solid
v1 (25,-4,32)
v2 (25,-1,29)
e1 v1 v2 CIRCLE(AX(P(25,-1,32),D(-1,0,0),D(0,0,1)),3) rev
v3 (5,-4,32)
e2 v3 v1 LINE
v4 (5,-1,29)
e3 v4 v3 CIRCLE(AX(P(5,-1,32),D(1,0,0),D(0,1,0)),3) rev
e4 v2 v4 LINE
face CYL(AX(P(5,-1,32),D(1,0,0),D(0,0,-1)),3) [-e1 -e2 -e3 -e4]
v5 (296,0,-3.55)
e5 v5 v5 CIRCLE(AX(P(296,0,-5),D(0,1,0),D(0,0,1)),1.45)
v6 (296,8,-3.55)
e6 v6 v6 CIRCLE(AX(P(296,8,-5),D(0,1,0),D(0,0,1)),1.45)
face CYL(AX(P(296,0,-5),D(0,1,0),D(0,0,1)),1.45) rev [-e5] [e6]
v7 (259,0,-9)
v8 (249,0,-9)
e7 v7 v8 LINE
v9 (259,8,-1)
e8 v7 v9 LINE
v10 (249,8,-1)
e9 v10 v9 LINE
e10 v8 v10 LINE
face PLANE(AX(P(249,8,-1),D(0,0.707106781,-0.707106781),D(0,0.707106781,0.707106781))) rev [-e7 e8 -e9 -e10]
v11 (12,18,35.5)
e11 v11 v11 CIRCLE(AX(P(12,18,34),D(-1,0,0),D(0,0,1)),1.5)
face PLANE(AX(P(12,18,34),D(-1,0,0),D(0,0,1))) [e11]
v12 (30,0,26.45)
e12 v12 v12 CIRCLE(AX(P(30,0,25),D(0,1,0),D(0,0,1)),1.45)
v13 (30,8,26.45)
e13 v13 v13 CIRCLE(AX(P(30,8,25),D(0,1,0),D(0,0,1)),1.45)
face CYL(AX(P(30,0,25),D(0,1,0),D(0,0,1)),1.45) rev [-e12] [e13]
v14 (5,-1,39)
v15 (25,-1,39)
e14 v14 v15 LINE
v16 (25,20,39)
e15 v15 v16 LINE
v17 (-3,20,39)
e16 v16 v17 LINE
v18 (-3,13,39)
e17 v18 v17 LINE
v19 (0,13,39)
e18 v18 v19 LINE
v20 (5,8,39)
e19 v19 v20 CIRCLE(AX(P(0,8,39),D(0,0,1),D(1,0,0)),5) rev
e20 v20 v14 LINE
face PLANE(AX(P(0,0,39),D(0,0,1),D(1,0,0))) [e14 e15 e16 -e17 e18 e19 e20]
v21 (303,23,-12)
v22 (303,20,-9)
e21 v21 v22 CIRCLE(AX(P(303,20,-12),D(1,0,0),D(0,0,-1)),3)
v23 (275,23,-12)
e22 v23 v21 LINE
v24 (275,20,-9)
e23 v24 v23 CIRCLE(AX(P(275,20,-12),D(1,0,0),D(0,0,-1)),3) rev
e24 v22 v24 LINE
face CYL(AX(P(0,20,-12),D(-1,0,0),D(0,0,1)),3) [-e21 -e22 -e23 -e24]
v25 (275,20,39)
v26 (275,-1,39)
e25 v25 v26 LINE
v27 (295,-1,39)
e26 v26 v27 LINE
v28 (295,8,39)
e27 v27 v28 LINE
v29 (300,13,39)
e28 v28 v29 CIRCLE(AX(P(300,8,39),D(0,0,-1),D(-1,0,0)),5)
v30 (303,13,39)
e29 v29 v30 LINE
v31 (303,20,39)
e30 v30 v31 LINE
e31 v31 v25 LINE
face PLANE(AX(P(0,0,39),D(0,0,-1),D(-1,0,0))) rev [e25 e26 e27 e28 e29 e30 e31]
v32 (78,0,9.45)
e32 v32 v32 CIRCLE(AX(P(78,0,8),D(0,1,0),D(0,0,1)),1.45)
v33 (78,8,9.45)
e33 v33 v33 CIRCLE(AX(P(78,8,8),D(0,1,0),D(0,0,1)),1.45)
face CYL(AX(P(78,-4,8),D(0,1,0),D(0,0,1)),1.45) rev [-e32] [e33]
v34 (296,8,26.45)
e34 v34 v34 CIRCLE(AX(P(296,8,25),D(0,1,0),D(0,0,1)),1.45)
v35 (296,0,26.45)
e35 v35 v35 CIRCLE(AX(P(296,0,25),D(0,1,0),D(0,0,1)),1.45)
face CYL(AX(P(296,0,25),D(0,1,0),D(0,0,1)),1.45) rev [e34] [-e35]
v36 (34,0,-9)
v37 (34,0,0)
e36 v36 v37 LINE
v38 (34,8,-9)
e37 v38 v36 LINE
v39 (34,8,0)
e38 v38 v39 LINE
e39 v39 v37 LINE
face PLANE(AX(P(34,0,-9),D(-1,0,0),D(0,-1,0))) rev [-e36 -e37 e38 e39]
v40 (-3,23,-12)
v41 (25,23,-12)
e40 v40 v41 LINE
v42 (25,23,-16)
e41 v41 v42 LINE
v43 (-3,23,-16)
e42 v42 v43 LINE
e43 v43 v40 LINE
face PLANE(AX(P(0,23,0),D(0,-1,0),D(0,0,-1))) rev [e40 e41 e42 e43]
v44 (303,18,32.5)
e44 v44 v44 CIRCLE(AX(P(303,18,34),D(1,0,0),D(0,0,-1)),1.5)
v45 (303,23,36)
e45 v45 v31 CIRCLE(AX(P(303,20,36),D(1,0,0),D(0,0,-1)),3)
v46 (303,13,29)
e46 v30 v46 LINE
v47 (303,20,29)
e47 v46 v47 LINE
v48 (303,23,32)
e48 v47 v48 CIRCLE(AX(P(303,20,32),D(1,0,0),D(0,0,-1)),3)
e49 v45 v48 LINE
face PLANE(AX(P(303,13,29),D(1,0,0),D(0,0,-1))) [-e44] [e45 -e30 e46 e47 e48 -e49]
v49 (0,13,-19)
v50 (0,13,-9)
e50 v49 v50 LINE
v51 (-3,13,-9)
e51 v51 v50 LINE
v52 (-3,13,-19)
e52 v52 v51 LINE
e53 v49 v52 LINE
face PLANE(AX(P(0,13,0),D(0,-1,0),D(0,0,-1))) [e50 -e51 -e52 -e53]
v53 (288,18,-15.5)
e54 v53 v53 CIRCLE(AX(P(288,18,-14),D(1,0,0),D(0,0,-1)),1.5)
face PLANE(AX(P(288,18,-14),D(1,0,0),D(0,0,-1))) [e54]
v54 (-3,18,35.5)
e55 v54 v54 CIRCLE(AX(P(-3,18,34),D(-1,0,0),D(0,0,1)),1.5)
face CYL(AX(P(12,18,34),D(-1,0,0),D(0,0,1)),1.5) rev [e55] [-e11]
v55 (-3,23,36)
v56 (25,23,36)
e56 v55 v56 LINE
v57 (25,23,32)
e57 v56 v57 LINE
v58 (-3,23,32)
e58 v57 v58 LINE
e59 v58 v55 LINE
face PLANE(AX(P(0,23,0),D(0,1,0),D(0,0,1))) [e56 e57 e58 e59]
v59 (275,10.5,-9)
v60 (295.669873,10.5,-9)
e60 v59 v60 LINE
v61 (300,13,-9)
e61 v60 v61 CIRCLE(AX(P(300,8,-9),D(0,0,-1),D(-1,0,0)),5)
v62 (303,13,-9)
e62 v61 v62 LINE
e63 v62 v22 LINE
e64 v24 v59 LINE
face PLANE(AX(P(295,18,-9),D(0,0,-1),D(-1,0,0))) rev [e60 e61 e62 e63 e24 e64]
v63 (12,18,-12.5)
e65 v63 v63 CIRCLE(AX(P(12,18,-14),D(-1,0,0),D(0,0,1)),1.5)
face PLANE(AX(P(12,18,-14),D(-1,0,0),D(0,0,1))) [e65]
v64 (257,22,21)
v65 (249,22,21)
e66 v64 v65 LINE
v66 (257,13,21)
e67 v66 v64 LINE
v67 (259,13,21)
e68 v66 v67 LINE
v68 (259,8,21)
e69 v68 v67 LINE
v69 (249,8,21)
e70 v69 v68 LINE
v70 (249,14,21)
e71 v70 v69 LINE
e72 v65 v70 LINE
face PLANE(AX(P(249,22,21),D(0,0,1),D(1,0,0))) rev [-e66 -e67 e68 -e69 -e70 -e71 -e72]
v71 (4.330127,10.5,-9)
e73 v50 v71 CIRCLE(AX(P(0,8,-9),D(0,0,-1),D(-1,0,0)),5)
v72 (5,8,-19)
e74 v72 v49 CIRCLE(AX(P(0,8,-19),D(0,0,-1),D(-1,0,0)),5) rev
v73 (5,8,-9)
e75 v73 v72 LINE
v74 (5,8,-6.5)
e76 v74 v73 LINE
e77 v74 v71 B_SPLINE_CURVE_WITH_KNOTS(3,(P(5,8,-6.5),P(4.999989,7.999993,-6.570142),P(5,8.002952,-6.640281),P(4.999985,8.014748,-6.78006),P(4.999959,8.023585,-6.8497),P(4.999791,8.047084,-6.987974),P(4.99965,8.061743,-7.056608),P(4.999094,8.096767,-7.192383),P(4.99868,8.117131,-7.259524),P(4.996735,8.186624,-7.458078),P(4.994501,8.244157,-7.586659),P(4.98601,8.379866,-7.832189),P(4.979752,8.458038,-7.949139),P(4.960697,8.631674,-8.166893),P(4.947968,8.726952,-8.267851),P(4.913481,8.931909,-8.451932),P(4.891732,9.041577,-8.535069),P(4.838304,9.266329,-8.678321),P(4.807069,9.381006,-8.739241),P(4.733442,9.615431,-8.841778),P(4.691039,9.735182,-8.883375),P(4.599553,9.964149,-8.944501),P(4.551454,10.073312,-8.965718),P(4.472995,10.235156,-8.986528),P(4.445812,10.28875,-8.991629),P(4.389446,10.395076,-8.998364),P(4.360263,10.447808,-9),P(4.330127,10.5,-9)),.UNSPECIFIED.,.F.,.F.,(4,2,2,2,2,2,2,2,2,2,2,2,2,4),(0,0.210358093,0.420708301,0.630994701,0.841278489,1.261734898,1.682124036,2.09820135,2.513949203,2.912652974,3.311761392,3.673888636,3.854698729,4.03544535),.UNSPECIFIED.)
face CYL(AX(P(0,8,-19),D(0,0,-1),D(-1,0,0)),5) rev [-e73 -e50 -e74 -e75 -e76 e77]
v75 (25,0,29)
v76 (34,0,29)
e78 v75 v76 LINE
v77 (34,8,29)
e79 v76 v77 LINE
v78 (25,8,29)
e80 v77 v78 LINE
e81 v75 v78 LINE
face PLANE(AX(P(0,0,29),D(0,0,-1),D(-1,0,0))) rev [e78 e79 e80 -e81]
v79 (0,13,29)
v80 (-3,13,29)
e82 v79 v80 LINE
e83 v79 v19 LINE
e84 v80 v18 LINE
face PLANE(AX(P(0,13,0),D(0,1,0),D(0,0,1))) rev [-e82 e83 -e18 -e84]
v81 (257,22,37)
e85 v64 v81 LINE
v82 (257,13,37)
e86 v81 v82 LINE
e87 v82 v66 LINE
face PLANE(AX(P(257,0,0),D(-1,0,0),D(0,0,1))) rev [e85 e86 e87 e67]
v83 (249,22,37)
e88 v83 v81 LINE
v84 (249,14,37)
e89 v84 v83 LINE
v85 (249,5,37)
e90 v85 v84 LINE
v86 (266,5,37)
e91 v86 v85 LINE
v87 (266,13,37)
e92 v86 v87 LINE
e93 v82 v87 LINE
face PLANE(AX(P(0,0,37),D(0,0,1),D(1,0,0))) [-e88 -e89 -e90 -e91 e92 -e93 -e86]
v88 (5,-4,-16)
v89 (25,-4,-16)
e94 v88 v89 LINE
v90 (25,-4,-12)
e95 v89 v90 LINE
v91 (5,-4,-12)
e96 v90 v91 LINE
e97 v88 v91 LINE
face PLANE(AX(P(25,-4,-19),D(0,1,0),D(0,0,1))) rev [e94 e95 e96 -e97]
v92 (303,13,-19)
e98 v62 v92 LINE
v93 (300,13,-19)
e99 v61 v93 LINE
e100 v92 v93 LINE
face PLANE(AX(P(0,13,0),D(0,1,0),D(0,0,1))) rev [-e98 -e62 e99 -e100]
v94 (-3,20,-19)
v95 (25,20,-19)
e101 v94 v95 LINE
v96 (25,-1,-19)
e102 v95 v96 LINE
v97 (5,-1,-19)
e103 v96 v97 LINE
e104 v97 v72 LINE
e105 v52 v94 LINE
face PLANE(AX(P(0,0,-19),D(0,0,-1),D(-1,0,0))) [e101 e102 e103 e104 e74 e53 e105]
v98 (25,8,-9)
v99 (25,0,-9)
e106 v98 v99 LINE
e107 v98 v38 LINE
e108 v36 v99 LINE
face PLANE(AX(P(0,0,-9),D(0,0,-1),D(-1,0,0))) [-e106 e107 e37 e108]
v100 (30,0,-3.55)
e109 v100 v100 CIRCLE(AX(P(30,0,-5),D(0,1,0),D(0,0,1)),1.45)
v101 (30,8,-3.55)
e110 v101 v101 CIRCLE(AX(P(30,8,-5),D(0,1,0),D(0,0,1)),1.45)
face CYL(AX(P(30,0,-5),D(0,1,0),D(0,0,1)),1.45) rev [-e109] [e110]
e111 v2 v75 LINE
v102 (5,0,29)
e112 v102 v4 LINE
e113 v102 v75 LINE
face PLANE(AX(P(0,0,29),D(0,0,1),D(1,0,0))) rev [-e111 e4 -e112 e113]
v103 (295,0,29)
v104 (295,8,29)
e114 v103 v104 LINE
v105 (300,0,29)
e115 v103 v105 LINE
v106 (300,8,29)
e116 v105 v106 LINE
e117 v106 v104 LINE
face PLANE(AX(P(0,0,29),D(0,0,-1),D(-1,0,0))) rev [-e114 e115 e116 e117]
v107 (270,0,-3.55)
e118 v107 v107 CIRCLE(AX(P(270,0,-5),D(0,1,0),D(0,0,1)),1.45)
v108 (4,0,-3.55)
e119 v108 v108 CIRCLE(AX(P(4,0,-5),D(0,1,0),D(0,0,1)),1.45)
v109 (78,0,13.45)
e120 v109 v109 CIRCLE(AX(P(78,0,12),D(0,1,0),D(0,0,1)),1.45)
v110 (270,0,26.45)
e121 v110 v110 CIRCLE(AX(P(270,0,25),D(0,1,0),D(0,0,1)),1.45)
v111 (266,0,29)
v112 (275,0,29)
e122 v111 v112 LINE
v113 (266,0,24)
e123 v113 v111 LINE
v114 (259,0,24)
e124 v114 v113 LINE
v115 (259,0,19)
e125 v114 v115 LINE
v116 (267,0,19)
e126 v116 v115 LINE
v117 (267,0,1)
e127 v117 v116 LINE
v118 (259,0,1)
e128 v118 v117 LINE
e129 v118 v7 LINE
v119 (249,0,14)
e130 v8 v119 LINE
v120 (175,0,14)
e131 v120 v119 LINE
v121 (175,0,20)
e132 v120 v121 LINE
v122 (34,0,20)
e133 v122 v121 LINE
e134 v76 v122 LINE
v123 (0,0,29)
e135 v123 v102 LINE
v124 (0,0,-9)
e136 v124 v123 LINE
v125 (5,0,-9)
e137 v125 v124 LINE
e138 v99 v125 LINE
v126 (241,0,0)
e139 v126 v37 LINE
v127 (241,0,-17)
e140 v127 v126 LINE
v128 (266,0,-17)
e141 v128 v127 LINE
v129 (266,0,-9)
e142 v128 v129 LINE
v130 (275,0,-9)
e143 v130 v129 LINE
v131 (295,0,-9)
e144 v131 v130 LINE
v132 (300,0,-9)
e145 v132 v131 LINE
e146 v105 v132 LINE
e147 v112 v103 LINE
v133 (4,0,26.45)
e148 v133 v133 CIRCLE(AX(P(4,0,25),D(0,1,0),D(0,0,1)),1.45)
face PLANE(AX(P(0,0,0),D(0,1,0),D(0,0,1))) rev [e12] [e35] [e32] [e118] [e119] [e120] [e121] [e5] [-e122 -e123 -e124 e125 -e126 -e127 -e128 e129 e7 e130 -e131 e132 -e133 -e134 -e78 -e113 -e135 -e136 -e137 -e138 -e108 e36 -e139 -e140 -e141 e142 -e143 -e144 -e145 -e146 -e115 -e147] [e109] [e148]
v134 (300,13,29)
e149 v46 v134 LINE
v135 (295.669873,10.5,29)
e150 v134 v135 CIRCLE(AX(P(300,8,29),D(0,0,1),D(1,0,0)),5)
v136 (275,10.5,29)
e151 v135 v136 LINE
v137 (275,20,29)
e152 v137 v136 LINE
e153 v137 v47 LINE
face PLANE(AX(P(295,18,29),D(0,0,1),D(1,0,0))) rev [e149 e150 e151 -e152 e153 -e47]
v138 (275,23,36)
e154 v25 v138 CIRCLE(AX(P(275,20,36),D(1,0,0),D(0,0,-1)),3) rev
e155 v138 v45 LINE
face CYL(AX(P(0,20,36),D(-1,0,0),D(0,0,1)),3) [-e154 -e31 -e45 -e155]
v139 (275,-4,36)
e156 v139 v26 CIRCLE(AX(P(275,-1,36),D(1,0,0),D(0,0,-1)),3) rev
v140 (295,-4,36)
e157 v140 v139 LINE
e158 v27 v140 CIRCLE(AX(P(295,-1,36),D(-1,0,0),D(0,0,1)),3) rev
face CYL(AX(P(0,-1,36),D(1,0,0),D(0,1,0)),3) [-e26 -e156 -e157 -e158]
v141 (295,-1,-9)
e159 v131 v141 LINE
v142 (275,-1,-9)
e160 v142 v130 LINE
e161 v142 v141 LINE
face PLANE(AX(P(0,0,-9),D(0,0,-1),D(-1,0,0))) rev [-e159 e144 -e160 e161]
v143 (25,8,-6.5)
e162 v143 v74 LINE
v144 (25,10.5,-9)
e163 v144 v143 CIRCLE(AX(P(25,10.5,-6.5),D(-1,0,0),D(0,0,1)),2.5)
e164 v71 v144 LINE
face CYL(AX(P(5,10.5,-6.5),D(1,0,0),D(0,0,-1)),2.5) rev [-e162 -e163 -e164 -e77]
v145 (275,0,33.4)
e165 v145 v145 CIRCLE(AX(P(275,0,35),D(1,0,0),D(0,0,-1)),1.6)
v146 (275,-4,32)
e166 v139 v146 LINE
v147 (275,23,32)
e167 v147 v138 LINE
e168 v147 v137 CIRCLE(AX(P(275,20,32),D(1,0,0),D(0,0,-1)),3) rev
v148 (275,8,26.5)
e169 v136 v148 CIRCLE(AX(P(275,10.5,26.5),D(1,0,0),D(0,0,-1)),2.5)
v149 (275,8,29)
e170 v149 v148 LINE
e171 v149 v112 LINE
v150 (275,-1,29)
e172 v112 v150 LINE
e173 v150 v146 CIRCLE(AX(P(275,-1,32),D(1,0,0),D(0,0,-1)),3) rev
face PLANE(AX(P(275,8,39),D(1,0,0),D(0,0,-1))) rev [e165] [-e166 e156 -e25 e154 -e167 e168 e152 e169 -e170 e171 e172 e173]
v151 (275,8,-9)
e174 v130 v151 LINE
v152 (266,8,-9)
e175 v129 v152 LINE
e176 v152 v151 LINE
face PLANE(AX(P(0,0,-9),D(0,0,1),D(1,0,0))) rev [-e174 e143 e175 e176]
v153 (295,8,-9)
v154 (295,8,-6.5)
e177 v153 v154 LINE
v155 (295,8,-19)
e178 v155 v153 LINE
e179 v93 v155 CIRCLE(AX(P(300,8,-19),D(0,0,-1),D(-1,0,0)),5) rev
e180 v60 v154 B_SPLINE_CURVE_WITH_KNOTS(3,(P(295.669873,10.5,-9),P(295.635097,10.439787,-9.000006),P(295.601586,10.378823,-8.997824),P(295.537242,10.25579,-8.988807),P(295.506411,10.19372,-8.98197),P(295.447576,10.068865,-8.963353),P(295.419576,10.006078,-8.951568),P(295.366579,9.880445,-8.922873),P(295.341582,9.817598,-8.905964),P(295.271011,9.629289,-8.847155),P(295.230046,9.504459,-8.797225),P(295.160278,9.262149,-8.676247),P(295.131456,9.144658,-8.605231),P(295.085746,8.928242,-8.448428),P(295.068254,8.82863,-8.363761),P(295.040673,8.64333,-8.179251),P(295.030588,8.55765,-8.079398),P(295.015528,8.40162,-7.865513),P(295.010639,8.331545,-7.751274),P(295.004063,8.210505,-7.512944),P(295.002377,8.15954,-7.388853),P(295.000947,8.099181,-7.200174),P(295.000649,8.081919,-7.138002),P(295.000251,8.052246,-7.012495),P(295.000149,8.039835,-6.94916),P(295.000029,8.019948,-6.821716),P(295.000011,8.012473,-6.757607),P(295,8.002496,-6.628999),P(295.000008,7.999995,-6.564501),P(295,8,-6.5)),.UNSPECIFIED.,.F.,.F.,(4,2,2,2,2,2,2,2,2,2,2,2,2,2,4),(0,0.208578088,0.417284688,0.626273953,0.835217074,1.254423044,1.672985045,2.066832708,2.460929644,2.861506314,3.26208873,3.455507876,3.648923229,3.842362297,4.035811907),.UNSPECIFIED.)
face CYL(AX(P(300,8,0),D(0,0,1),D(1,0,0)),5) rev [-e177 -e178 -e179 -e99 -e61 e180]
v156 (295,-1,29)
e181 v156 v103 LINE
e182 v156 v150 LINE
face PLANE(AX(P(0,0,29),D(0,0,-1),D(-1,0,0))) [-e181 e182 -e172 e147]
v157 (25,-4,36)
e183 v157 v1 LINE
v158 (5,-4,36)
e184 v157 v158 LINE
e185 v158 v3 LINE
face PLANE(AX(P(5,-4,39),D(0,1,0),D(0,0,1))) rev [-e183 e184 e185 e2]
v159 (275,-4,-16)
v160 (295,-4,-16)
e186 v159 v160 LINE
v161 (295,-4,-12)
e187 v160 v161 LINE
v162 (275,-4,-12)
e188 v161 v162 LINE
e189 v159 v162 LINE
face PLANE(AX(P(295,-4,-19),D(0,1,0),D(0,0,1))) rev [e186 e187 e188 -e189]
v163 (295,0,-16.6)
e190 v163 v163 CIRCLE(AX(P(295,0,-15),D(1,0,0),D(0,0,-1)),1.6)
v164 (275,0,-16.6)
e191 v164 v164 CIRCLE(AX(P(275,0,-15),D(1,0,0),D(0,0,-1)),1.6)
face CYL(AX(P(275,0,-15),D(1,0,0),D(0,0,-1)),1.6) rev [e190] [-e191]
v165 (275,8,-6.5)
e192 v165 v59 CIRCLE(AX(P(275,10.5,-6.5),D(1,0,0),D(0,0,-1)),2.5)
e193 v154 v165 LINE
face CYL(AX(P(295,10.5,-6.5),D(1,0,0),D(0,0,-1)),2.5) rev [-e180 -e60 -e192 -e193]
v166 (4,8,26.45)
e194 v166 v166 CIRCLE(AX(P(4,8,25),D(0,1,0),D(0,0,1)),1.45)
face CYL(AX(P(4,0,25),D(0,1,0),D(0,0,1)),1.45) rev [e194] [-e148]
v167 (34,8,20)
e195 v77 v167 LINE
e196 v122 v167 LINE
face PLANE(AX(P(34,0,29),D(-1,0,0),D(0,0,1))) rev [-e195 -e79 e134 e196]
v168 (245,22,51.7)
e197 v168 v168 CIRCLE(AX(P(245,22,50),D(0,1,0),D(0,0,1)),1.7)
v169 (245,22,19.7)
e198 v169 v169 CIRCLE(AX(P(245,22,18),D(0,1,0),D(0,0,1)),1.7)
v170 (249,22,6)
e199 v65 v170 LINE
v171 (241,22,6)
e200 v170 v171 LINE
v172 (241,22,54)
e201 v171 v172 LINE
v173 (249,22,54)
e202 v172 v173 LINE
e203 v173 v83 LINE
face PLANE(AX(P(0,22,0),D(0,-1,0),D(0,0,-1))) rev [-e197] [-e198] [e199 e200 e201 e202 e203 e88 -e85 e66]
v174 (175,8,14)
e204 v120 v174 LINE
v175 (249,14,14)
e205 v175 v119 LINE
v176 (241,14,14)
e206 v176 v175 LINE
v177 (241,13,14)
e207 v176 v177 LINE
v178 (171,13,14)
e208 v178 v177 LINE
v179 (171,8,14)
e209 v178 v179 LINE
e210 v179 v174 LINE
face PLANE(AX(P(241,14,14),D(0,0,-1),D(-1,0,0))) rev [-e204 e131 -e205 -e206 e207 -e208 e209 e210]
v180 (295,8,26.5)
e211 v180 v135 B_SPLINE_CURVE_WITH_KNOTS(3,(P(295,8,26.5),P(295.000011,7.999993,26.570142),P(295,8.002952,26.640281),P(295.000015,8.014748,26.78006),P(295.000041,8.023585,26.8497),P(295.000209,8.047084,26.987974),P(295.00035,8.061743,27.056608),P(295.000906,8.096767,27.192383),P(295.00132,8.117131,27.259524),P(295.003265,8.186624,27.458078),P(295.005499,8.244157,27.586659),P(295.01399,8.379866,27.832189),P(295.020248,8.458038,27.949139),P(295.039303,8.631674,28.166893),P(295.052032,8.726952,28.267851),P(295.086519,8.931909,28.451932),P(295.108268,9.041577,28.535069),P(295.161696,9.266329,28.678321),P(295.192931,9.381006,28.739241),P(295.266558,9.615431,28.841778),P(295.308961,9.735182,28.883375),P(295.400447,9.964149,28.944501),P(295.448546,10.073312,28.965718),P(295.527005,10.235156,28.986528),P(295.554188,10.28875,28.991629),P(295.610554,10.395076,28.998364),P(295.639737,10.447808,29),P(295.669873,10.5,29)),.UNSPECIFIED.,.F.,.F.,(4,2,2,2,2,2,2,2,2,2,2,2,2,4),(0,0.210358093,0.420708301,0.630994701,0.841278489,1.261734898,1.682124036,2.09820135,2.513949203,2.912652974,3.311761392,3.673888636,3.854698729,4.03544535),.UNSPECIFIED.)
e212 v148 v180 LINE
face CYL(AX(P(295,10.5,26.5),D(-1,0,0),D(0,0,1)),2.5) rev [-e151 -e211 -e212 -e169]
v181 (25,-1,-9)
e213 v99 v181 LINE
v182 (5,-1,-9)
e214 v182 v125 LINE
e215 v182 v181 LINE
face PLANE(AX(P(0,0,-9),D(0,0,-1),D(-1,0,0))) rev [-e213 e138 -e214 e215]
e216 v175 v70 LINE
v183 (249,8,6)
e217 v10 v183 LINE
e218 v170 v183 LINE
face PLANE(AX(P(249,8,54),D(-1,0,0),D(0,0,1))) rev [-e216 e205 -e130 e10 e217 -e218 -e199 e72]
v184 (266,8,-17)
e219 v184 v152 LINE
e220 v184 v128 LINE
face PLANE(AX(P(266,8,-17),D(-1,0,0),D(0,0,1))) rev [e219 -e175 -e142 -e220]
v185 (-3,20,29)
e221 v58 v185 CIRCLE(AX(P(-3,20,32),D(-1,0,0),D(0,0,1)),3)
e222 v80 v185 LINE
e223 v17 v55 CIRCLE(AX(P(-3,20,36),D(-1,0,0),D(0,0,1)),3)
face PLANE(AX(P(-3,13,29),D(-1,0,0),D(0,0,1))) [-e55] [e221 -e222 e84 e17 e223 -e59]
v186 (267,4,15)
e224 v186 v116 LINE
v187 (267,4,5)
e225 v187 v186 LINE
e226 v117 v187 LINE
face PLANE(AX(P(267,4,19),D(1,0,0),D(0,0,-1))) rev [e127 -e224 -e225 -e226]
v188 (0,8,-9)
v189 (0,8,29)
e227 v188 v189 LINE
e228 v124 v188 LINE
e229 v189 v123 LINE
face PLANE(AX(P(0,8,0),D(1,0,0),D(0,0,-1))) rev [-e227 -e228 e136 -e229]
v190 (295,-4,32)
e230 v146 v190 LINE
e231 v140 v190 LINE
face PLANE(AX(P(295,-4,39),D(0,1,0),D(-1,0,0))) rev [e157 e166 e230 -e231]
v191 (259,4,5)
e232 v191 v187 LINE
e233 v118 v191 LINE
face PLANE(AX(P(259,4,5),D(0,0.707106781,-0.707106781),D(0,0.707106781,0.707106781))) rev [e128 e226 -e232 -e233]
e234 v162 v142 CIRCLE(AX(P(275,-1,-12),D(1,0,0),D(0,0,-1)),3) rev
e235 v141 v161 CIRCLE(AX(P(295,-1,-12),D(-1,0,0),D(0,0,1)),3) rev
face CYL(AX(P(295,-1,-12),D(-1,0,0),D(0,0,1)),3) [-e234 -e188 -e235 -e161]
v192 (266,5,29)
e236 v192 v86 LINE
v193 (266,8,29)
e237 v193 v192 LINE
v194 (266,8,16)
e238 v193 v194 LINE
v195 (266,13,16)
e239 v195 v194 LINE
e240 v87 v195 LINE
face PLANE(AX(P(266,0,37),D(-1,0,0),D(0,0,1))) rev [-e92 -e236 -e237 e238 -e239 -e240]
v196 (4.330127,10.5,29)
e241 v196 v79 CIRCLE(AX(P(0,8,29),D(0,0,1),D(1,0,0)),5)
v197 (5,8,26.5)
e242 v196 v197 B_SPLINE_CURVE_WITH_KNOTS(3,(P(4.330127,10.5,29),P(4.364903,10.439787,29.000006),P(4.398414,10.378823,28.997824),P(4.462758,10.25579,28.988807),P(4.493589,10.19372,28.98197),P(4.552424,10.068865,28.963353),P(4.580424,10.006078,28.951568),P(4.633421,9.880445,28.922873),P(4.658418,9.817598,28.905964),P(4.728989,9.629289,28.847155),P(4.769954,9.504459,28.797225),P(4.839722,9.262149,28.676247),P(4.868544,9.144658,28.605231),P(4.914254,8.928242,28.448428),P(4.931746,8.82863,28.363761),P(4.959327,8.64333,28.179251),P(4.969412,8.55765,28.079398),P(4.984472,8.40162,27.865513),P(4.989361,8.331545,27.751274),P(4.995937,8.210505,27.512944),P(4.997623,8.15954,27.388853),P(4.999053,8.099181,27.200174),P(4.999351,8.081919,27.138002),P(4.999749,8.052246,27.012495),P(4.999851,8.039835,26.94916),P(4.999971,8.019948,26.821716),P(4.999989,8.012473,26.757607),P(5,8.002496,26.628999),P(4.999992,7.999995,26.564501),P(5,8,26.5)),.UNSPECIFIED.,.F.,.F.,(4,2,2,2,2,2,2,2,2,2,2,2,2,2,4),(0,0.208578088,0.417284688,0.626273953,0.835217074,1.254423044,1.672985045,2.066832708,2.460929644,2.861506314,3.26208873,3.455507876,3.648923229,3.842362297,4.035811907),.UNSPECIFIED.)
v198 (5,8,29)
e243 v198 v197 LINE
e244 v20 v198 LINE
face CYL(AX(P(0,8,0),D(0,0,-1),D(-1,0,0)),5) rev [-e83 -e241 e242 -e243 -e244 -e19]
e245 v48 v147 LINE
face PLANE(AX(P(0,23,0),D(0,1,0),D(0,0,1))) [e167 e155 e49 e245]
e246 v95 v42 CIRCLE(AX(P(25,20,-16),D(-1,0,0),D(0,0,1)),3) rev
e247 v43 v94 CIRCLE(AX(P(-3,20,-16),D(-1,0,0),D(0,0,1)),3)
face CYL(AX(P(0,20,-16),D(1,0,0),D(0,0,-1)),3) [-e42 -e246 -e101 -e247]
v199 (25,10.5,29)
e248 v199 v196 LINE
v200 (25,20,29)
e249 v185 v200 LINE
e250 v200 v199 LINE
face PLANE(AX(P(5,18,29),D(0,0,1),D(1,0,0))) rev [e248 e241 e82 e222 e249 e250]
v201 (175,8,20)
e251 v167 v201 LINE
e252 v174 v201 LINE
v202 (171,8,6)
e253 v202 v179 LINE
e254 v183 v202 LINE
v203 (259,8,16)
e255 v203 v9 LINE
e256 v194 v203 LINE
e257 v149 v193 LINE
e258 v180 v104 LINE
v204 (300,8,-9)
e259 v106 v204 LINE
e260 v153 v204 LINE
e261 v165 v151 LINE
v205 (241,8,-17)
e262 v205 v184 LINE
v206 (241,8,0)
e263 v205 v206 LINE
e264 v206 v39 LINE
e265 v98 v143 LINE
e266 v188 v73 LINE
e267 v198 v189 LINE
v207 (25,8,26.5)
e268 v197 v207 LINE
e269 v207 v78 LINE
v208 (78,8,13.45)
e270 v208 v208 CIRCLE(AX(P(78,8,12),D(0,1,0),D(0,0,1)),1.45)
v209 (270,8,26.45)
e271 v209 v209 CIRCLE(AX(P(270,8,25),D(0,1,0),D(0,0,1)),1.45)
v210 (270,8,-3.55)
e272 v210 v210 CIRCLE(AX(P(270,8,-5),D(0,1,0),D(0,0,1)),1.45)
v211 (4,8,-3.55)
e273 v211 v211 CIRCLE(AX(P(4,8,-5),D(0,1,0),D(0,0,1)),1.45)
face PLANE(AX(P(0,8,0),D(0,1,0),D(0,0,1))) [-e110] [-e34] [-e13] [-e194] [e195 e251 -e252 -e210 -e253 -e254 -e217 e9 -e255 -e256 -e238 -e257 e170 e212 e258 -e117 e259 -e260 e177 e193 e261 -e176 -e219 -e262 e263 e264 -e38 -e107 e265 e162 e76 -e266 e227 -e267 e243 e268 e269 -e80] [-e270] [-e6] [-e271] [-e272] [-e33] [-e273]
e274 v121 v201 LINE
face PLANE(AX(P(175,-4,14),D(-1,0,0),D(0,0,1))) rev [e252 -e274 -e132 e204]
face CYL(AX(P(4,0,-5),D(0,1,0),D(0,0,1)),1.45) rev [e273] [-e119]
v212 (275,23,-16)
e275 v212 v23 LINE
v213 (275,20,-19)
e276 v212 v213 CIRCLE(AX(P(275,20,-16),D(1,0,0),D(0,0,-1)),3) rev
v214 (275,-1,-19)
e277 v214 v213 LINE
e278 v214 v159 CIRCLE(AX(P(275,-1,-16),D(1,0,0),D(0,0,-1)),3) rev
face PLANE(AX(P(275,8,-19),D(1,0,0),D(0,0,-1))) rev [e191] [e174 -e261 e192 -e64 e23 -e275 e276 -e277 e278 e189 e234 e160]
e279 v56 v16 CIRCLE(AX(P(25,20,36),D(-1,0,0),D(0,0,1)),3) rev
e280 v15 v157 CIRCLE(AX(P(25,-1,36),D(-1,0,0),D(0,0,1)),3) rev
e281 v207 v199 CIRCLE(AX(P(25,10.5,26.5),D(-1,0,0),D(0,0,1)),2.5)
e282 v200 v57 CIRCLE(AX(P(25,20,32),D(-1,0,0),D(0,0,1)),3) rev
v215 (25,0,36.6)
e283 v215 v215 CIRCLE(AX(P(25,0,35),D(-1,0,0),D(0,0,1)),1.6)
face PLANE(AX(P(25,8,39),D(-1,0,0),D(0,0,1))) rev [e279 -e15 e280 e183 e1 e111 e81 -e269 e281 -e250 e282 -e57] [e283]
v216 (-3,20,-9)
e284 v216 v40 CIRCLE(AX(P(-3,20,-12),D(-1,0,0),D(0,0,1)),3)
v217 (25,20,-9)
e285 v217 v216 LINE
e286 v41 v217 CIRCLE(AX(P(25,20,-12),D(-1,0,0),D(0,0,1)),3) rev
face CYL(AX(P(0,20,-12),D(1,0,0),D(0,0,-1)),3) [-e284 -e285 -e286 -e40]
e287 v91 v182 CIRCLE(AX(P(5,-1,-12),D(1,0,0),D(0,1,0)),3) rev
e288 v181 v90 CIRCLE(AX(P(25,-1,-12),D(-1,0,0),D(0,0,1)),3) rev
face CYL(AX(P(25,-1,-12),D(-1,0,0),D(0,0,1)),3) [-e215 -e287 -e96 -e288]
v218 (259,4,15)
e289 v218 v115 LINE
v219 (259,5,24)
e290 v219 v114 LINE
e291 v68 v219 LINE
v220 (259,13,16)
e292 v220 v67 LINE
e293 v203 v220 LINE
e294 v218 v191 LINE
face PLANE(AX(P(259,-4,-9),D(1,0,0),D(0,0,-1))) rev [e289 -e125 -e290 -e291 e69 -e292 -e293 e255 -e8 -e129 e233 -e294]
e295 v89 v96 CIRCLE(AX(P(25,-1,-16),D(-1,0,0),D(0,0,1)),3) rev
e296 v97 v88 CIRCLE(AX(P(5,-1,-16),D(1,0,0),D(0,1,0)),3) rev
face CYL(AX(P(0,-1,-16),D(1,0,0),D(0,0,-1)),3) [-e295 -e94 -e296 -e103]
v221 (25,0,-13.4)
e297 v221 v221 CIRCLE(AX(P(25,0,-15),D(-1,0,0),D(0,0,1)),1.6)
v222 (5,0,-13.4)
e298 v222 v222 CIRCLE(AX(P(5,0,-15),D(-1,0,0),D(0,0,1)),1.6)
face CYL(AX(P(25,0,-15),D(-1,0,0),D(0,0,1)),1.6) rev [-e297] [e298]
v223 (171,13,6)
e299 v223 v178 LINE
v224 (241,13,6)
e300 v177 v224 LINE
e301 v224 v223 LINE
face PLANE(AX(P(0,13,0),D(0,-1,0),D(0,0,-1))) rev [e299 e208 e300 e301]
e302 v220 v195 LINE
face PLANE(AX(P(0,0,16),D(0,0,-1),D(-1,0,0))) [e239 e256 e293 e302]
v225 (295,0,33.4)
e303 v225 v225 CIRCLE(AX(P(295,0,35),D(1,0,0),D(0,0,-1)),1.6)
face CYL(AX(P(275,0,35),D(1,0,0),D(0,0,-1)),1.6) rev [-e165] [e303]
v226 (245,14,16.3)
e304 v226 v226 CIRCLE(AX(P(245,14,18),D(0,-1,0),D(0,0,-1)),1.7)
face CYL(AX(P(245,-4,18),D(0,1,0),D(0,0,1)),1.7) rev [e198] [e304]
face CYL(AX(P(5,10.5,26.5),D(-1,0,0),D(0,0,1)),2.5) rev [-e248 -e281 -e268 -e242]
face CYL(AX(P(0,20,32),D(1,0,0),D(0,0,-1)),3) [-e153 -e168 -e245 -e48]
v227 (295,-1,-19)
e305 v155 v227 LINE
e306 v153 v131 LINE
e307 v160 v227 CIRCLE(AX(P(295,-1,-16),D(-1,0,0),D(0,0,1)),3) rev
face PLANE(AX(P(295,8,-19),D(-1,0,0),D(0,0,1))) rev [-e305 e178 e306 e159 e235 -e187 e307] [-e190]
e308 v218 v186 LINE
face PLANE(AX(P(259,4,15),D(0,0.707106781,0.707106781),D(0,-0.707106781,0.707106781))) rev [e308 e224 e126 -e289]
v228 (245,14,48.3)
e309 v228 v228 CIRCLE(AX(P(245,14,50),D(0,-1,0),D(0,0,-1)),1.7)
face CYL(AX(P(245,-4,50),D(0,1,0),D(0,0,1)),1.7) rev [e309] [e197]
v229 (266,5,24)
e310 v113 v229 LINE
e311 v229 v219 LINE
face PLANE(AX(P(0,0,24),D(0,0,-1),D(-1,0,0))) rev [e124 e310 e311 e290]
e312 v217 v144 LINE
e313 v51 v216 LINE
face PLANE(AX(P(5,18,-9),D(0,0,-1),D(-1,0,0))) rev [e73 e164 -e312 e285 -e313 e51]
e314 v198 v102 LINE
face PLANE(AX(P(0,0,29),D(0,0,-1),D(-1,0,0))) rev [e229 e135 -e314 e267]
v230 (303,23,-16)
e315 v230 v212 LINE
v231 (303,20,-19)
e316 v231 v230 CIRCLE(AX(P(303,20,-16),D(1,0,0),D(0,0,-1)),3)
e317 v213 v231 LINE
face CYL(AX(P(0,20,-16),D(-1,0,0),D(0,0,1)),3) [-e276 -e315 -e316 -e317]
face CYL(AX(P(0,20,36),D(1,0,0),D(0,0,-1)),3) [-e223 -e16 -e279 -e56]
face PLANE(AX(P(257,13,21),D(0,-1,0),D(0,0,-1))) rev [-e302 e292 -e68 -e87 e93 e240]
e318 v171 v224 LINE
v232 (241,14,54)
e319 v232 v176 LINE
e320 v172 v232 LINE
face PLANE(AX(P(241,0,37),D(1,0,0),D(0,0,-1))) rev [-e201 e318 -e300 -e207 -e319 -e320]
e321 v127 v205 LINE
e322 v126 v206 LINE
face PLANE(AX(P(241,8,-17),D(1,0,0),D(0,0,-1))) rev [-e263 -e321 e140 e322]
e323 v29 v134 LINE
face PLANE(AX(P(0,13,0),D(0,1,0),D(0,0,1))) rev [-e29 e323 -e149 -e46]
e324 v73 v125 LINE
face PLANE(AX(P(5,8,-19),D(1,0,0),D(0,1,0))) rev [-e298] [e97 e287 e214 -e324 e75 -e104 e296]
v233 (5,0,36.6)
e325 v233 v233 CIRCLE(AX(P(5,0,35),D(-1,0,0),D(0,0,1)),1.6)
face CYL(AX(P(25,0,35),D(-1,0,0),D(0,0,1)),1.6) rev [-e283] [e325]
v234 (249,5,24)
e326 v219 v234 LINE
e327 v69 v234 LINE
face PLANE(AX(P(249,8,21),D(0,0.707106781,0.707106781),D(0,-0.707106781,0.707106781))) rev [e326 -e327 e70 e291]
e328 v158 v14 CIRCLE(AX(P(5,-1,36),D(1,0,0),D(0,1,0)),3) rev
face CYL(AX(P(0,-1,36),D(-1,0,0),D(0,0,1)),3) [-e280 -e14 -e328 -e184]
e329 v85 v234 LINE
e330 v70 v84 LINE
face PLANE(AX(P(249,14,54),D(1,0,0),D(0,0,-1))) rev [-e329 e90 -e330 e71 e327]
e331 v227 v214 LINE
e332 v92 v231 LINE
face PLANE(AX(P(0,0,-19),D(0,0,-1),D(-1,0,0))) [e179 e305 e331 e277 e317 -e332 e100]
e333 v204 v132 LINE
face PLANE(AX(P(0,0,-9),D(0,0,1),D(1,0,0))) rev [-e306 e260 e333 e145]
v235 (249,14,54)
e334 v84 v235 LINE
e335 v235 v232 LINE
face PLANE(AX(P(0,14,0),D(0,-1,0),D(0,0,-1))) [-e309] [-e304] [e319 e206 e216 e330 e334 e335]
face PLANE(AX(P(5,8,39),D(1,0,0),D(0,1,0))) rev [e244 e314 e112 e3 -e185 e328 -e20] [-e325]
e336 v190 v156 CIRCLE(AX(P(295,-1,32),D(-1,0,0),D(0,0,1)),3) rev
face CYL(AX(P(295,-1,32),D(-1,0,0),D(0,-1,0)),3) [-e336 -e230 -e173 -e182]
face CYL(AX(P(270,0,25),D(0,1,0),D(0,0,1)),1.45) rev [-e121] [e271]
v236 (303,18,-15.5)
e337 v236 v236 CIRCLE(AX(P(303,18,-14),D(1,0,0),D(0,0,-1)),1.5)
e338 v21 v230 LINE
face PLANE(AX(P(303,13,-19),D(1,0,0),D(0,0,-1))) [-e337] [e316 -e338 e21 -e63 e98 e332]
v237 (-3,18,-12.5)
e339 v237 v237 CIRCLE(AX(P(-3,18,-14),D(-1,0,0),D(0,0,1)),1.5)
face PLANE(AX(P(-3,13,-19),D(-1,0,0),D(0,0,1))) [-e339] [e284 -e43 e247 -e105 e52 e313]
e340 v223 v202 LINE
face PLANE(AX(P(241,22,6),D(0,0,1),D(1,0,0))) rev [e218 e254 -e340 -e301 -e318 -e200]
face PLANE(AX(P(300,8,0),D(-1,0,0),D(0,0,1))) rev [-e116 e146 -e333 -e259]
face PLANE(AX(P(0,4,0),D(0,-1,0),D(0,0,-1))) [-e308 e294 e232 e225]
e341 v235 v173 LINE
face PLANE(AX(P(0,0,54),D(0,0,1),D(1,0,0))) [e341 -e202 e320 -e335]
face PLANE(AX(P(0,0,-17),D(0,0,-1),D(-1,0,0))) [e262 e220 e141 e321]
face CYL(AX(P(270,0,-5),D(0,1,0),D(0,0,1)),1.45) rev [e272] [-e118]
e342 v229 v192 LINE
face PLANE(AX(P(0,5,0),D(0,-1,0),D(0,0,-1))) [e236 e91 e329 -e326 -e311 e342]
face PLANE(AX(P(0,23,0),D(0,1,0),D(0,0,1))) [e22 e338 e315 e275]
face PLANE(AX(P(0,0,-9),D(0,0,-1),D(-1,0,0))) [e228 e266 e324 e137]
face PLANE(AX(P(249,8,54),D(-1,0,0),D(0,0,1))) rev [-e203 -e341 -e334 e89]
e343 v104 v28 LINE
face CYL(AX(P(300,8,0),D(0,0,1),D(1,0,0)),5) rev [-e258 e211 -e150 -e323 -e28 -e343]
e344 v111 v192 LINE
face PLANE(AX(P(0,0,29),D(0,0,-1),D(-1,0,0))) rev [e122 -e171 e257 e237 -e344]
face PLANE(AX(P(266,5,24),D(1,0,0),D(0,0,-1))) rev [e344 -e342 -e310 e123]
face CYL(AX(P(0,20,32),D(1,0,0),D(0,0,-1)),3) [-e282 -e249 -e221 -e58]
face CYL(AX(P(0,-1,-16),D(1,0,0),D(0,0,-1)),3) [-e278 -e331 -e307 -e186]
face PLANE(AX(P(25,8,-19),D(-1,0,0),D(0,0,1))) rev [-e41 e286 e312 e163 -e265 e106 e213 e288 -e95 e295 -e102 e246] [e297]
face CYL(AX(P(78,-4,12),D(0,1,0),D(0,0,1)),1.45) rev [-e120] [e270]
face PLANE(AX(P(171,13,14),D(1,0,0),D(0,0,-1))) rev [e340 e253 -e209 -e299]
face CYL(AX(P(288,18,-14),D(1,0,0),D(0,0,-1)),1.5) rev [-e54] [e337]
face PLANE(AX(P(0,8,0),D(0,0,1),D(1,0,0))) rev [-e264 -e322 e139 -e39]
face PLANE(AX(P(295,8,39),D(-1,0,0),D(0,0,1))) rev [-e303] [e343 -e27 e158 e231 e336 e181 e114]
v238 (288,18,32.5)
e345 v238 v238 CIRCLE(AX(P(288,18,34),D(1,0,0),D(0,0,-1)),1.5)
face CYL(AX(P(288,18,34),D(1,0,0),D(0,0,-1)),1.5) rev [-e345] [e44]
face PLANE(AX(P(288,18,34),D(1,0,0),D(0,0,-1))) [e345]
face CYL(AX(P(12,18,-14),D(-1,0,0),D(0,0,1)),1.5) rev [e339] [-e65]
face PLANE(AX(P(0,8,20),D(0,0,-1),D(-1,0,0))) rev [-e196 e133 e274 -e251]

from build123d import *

# Parameters (mm, degrees)
SKETCH1_W                 = 300
SKETCH1_H                 = 20
BOSS_EXTRUDE1_DEPTH       = 8
SKETCH2_W                 = 34
SKETCH2_H                 = 8
BOSS_EXTRUDE2_DEPTH       = 9
SKETCH3_W                 = 34
SKETCH3_H                 = 8
BOSS_EXTRUDE3_DEPTH       = 9
SKETCH4_R                 = 1.45
CUT_EXTRUDE1_DEPTH        = 302.504560496
SKETCH5_W                 = 25
SKETCH5_H                 = 8
BOSS_EXTRUDE4_DEPTH       = 17
SKETCH6_W                 = 25
SKETCH6_H                 = 8
BOSS_EXTRUDE5_DEPTH       = 17
SKETCH12_W                = 8
SKETCH12_H                = 8
BOSS_EXTRUDE7_DEPTH       = 17
SKETCH14_W                = 20
SKETCH14_H                = 12
BOSS_EXTRUDE8_DEPTH       = 10
SKETCH15_R                = 1.6
CUT_EXTRUDE7_DEPTH        = 20
SKETCH16_W                = 20
SKETCH16_H                = 12
BOSS_EXTRUDE9_DEPTH       = 10
SKETCH17_R                = 1.6
CUT_EXTRUDE8_DEPTH        = 20
SKETCH18_W                = 20
SKETCH18_H                = 12
BOSS_EXTRUDE10_DEPTH      = 10
CUT_EXTRUDE9_START        = -20
SKETCH19_R                = 1.6
CUT_EXTRUDE9_DEPTH        = 20
SKETCH20_W                = 20
SKETCH20_H                = 12
BOSS_EXTRUDE11_DEPTH      = 10
CUT_EXTRUDE10_START       = -20
SKETCH21_R                = 1.6
CUT_EXTRUDE10_DEPTH       = 20
SKETCH22_W                = 10
SKETCH22_H                = 38
CUT_EXTRUDE11_DEPTH       = 306.057371653
SKETCH23_W                = 8
SKETCH23_H                = 18
CUT_EXTRUDE12_DEPTH       = 4
BOSS_EXTRUDE12_DEPTH      = 10
BOSS_EXTRUDE13_DEPTH      = 8
SKETCH26_W                = 8
SKETCH26_H                = 48
BOSS_EXTRUDE14_DEPTH      = 14
SKETCH27_W                = 8
SKETCH27_H                = 16
BOSS_EXTRUDE15_DEPTH      = 14
SKETCH28_W                = 8
SKETCH28_H                = 40
CUT_EXTRUDE13_DEPTH       = 14
SKETCH30_W                = 16
SKETCH30_H                = 14
BOSS_EXTRUDE16_DEPTH      = 9
SKETCH31_W                = 17
SKETCH31_H                = 8
CUT_EXTRUDE14_DEPTH       = 5
SKETCH32_W                = 16
SKETCH32_H                = 9
CUT_EXTRUDE15_DEPTH       = 9
CUT_EXTRUDE16_DEPTH       = 10
SKETCH34_W                = 7
SKETCH34_H                = 5
CUT_EXTRUDE17_DEPTH       = 5
SKETCH35_W                = 7
SKETCH35_H                = 5
BOSS_EXTRUDE17_DEPTH      = 5
SKETCH36_R                = 1.7
CUT_EXTRUDE18_DEPTH       = 306.928096127
SKETCH37_W                = 70
SKETCH37_H                = 8
BOSS_EXTRUDE18_DEPTH      = 5
SKETCH39_W                = 66
SKETCH39_H                = 6
CUT_EXTRUDE19_DEPTH       = 306.14258962
SKETCH40_W                = 20
SKETCH40_H                = 10
BOSS_EXTRUDE19_DEPTH      = 10
BOSS_EXTRUDE20_DEPTH      = 5
BOSS_EXTRUDE20_DEPTH_BACK = 5
SKETCH41_W                = 28
SKETCH41_H                = 10
SKETCH42_R                = 1.5
CUT_EXTRUDE20_DEPTH       = 15
SKETCH43_W                = 20
SKETCH43_H                = 10
BOSS_EXTRUDE21_DEPTH      = 10
BOSS_EXTRUDE22_DEPTH      = 5
BOSS_EXTRUDE22_DEPTH_BACK = 5
SKETCH44_W                = 28
SKETCH44_H                = 10
SKETCH45_R                = 1.5
CUT_EXTRUDE21_DEPTH       = 15
SKETCH46_W                = 20
SKETCH46_H                = 10
BOSS_EXTRUDE23_DEPTH      = 10
BOSS_EXTRUDE24_DEPTH      = 5
BOSS_EXTRUDE24_DEPTH_BACK = 5
SKETCH47_W                = 28
SKETCH47_H                = 10
CUT_EXTRUDE22_START       = -15
SKETCH48_R                = 1.5
CUT_EXTRUDE22_DEPTH       = 15
FILLET1_R                 = 5
FILLET2_R                 = 2.5
FILLET3_R                 = 3
FILLET4_R                 = 3
SKETCH49_R                = 1.45
CUT_EXTRUDE23_DEPTH       = 309.139578763


with BuildPart() as part:
    # Sketch1 → Boss-Extrude1 (new body)
    with BuildSketch(Plane(origin=(0, 0, 0), x_dir=(1, 0, 0), z_dir=(0, 1, 0))):
        with Locations((150, -10)):
            Rectangle(SKETCH1_W, SKETCH1_H)
    extrude(amount=BOSS_EXTRUDE1_DEPTH)

    # Sketch2 → Boss-Extrude2 (add)
    with BuildSketch(Plane.XY.offset(20)):
        with Locations((17, 4)):
            Rectangle(SKETCH2_W, SKETCH2_H)
        with Locations((283, 4)):
            Rectangle(SKETCH2_W, SKETCH2_H)
    extrude(amount=BOSS_EXTRUDE2_DEPTH)

    # Sketch3 → Boss-Extrude3 (add)
    with BuildSketch(Plane(origin=(0, 0, 0), x_dir=(-1, 0, 0), z_dir=(0, 0, -1))):
        with Locations((-17, 4)):
            Rectangle(SKETCH3_W, SKETCH3_H)
        with Locations((-283, 4)):
            Rectangle(SKETCH3_W, SKETCH3_H)
    extrude(amount=BOSS_EXTRUDE3_DEPTH)

    # Sketch4 → Cut-Extrude1 (cut, through all)
    with BuildSketch(Plane(origin=(0, 8, 0), x_dir=(1, 0, 0), z_dir=(0, 1, 0))):
        with Locations(Location((4, 5, 0), (0, 0, 270))):
            Circle(SKETCH4_R)
        with Locations(Location((30, 5, 0), (0, 0, 270))):
            Circle(SKETCH4_R)
        with Locations(Location((30, -25, 0), (0, 0, 270))):
            Circle(SKETCH4_R)
        with Locations(Location((4, -25, 0), (0, 0, 270))):
            Circle(SKETCH4_R)
        with Locations(Location((296, -25, 0), (0, 0, 270))):
            Circle(SKETCH4_R)
        with Locations(Location((296, 5, 0), (0, 0, 270))):
            Circle(SKETCH4_R)
        with Locations(Location((270, -25, 0), (0, 0, 270))):
            Circle(SKETCH4_R)
        with Locations(Location((270, 5, 0), (0, 0, 270))):
            Circle(SKETCH4_R)
    extrude(amount=-CUT_EXTRUDE1_DEPTH, mode=Mode.SUBTRACT)

    # Sketch5 → Boss-Extrude4 (add)
    with BuildSketch(Plane.XY.offset(20)):
        with Locations((253.5, 4)):
            Rectangle(SKETCH5_W, SKETCH5_H)
    extrude(amount=BOSS_EXTRUDE4_DEPTH)

    # Sketch6 → Boss-Extrude5 (add)
    with BuildSketch(Plane(origin=(0, 0, 0), x_dir=(-1, 0, 0), z_dir=(0, 0, -1))):
        with Locations((-253.5, 4)):
            Rectangle(SKETCH6_W, SKETCH6_H)
    extrude(amount=BOSS_EXTRUDE5_DEPTH)

    # Sketch12 → Boss-Extrude7 (add)
    with BuildSketch(Plane.XY.offset(37)):
        with Locations((245, 4)):
            Rectangle(SKETCH12_W, SKETCH12_H)
    extrude(amount=BOSS_EXTRUDE7_DEPTH)

    # Sketch14 → Boss-Extrude8 (add)
    with BuildSketch(Plane.XY.offset(29)):
        with Locations((285, 2)):
            Rectangle(SKETCH14_W, SKETCH14_H)
    extrude(amount=BOSS_EXTRUDE8_DEPTH)

    # Sketch15 → Cut-Extrude7 (cut)
    with BuildSketch(Plane(origin=(295, 0, 0), x_dir=(0, 0, -1), z_dir=(1, 0, 0))):
        with Locations((-35, 0)):
            Circle(SKETCH15_R)
    extrude(amount=-CUT_EXTRUDE7_DEPTH, mode=Mode.SUBTRACT)

    # Sketch16 → Boss-Extrude9 (add)
    with BuildSketch(Plane(origin=(0, 0, -9), x_dir=(-1, 0, 0), z_dir=(0, 0, -1))):
        with Locations((-285, 2)):
            Rectangle(SKETCH16_W, SKETCH16_H)
    extrude(amount=BOSS_EXTRUDE9_DEPTH)

    # Sketch17 → Cut-Extrude8 (cut)
    with BuildSketch(Plane(origin=(295, 0, 0), x_dir=(0, 0, -1), z_dir=(1, 0, 0))):
        with Locations((15, 0)):
            Circle(SKETCH17_R)
    extrude(amount=-CUT_EXTRUDE8_DEPTH, mode=Mode.SUBTRACT)

    # Sketch18 → Boss-Extrude10 (add)
    with BuildSketch(Plane(origin=(0, 0, -9), x_dir=(-1, 0, 0), z_dir=(0, 0, -1))):
        with Locations((-15, 2)):
            Rectangle(SKETCH18_W, SKETCH18_H)
    extrude(amount=BOSS_EXTRUDE10_DEPTH)

    # Sketch19 → Cut-Extrude9 (cut)
    with BuildSketch(Plane.ZY.offset(-5).offset(CUT_EXTRUDE9_START)):
        with Locations(Location((-15, 0, 0), (0, 0, 180))):
            Circle(SKETCH19_R)
    extrude(amount=CUT_EXTRUDE9_DEPTH, mode=Mode.SUBTRACT)

    # Sketch20 → Boss-Extrude11 (add)
    with BuildSketch(Plane.XY.offset(29)):
        with Locations((15, 2)):
            Rectangle(SKETCH20_W, SKETCH20_H)
    extrude(amount=BOSS_EXTRUDE11_DEPTH)

    # Sketch21 → Cut-Extrude10 (cut)
    with BuildSketch(Plane.ZY.offset(-5).offset(CUT_EXTRUDE10_START)):
        with Locations(Location((35, 0, 0), (0, 0, 180))):
            Circle(SKETCH21_R)
    extrude(amount=CUT_EXTRUDE10_DEPTH, mode=Mode.SUBTRACT)

    # Sketch22 → Cut-Extrude11 (cut, through all)
    with BuildSketch(Plane(origin=(0, 8, 0), x_dir=(1, 0, 0), z_dir=(0, 1, 0))):
        with Locations((254, -10)):
            Rectangle(SKETCH22_W, SKETCH22_H)
    extrude(amount=-CUT_EXTRUDE11_DEPTH, mode=Mode.SUBTRACT)

    # Sketch23 → Cut-Extrude12 (cut)
    with BuildSketch(Plane(origin=(0, 0, 0), x_dir=(-1, 0, 0), z_dir=(0, -1, 0))):
        with Locations((-263, -10)):
            Rectangle(SKETCH23_W, SKETCH23_H)
    extrude(amount=-CUT_EXTRUDE12_DEPTH, mode=Mode.SUBTRACT)

    # Sketch24 → Boss-Extrude12 (add)
    with BuildSketch(Plane.ZY.offset(-259)):
        Polygon((-9, 0), (-9, 8), (-1, 8), align=None)
        Polygon((29, 0), (29, 8), (21, 8), align=None)
    extrude(amount=BOSS_EXTRUDE12_DEPTH)

    # Sketch25 → Boss-Extrude13 (add)
    with BuildSketch(Plane.ZY.offset(-267)):
        Polygon((19, 0), (19, 4), (15, 4), align=None)
        Polygon((1, 4), (5, 4), (1, 0), align=None)
    extrude(amount=BOSS_EXTRUDE13_DEPTH)

    # Sketch26 → Boss-Extrude14 (add)
    with BuildSketch(Plane(origin=(0, 8, 0), x_dir=(1, 0, 0), z_dir=(0, 1, 0))):
        with Locations((245, -30)):
            Rectangle(SKETCH26_W, SKETCH26_H)
    extrude(amount=BOSS_EXTRUDE14_DEPTH)

    # Sketch27 → Boss-Extrude15 (add)
    with BuildSketch(Plane(origin=(0, 8, 0), x_dir=(1, 0, 0), z_dir=(0, 1, 0))):
        with Locations((253, -29)):
            Rectangle(SKETCH27_W, SKETCH27_H)
    extrude(amount=BOSS_EXTRUDE15_DEPTH)

    # Sketch28 → Cut-Extrude13 (cut)
    with BuildSketch(Plane.XZ):
        with Locations((245, 34)):
            Rectangle(SKETCH28_W, SKETCH28_H)
    extrude(amount=-CUT_EXTRUDE13_DEPTH, mode=Mode.SUBTRACT)

    # Sketch30 → Boss-Extrude16 (add)
    with BuildSketch(Plane(origin=(257, 0, 0), x_dir=(0, 0, -1), z_dir=(1, 0, 0))):
        with Locations((-29, 15)):
            Rectangle(SKETCH30_W, SKETCH30_H)
    extrude(amount=BOSS_EXTRUDE16_DEPTH)

    # Sketch31 → Cut-Extrude14 (cut)
    with BuildSketch(Plane(origin=(0, 0, 0), x_dir=(-1, 0, 0), z_dir=(0, -1, 0))):
        with Locations((-257.5, -33)):
            Rectangle(SKETCH31_W, SKETCH31_H)
    extrude(amount=-CUT_EXTRUDE14_DEPTH, mode=Mode.SUBTRACT)

    # Sketch32 → Cut-Extrude15 (cut)
    with BuildSketch(Plane(origin=(266, 0, 0), x_dir=(0, 0, -1), z_dir=(1, 0, 0))):
        with Locations((-29, 17.5)):
            Rectangle(SKETCH32_W, SKETCH32_H)
    extrude(amount=-CUT_EXTRUDE15_DEPTH, mode=Mode.SUBTRACT)

    # Sketch33 → Cut-Extrude16 (cut)
    with BuildSketch(Plane.ZY.offset(-249)):
        Polygon((29, 5), (24, 5), (29, 0), align=None)
    extrude(amount=-CUT_EXTRUDE16_DEPTH, mode=Mode.SUBTRACT)

    # Sketch34 → Cut-Extrude17 (cut)
    with BuildSketch(Plane.XY.offset(29)):
        with Locations((262.5, 2.5)):
            Rectangle(SKETCH34_W, SKETCH34_H)
    extrude(amount=-CUT_EXTRUDE17_DEPTH, mode=Mode.SUBTRACT)

    # Sketch35 → Boss-Extrude17 (add)
    with BuildSketch(Plane(origin=(0, 0, 21), x_dir=(-1, 0, 0), z_dir=(0, 0, -1))):
        with Locations((-262.5, 10.5)):
            Rectangle(SKETCH35_W, SKETCH35_H)
    extrude(amount=BOSS_EXTRUDE17_DEPTH)

    # Sketch36 → Cut-Extrude18 (cut, through all)
    with BuildSketch(Plane(origin=(0, 22, 0), x_dir=(1, 0, 0), z_dir=(0, 1, 0))):
        with Locations(Location((245, -50, 0), (0, 0, 270))):
            Circle(SKETCH36_R)
        with Locations(Location((245, -18, 0), (0, 0, 270))):
            Circle(SKETCH36_R)
    extrude(amount=-CUT_EXTRUDE18_DEPTH, mode=Mode.SUBTRACT)

    # Sketch37 → Boss-Extrude18 (add)
    with BuildSketch(Plane(origin=(0, 8, 0), x_dir=(1, 0, 0), z_dir=(0, 1, 0))):
        with Locations((206, -10)):
            Rectangle(SKETCH37_W, SKETCH37_H)
    extrude(amount=BOSS_EXTRUDE18_DEPTH)

    # Sketch39 → Cut-Extrude19 (cut, through all)
    with BuildSketch(Plane(origin=(0, 8, 0), x_dir=(1, 0, 0), z_dir=(0, 1, 0))):
        with Locations((208, -17)):
            Rectangle(SKETCH39_W, SKETCH39_H)
    extrude(amount=-CUT_EXTRUDE19_DEPTH, mode=Mode.SUBTRACT)

    # Sketch40 → Boss-Extrude19 (add)
    with BuildSketch(Plane(origin=(0, 8, 0), x_dir=(1, 0, 0), z_dir=(0, 1, 0))):
        with Locations((15, 14)):
            Rectangle(SKETCH40_W, SKETCH40_H)
    extrude(amount=BOSS_EXTRUDE19_DEPTH)

    # Sketch41 → Boss-Extrude20 (add, two sides: drawn at the far end of the back side and taken through both)
    with BuildSketch(Plane(origin=(0, 18, 0), x_dir=(1, 0, 0), z_dir=(0, 1, 0)).offset(-BOSS_EXTRUDE20_DEPTH_BACK)):
        with Locations((11, 14)):
            Rectangle(SKETCH41_W, SKETCH41_H)
    extrude(amount=BOSS_EXTRUDE20_DEPTH + BOSS_EXTRUDE20_DEPTH_BACK)

    # Sketch42 → Cut-Extrude20 (cut)
    with BuildSketch(Plane.ZY.offset(3)):
        with Locations((-14, 18)):
            Circle(SKETCH42_R)
    extrude(amount=-CUT_EXTRUDE20_DEPTH, mode=Mode.SUBTRACT)

    # Sketch43 → Boss-Extrude21 (add)
    with BuildSketch(Plane(origin=(0, 8, 0), x_dir=(1, 0, 0), z_dir=(0, 1, 0))):
        with Locations((15, -34)):
            Rectangle(SKETCH43_W, SKETCH43_H)
    extrude(amount=BOSS_EXTRUDE21_DEPTH)

    # Sketch44 → Boss-Extrude22 (add, two sides: drawn at the far end of the back side and taken through both)
    with BuildSketch(Plane(origin=(0, 18, 0), x_dir=(1, 0, 0), z_dir=(0, 1, 0)).offset(-BOSS_EXTRUDE22_DEPTH_BACK)):
        with Locations((11, -34)):
            Rectangle(SKETCH44_W, SKETCH44_H)
    extrude(amount=BOSS_EXTRUDE22_DEPTH + BOSS_EXTRUDE22_DEPTH_BACK)

    # Sketch45 → Cut-Extrude21 (cut)
    with BuildSketch(Plane.ZY.offset(3)):
        with Locations((34, 18)):
            Circle(SKETCH45_R)
    extrude(amount=-CUT_EXTRUDE21_DEPTH, mode=Mode.SUBTRACT)

    # Sketch46 → Boss-Extrude23 (add)
    with BuildSketch(Plane(origin=(0, 8, 0), x_dir=(1, 0, 0), z_dir=(0, 1, 0))):
        with Locations((285, 14)):
            Rectangle(SKETCH46_W, SKETCH46_H)
        with Locations((285, -34)):
            Rectangle(SKETCH46_W, SKETCH46_H)
    extrude(amount=BOSS_EXTRUDE23_DEPTH)

    # Sketch47 → Boss-Extrude24 (add, two sides: drawn at the far end of the back side and taken through both)
    with BuildSketch(Plane(origin=(0, 18, 0), x_dir=(1, 0, 0), z_dir=(0, 1, 0)).offset(-BOSS_EXTRUDE24_DEPTH_BACK)):
        with Locations((289, 14)):
            Rectangle(SKETCH47_W, SKETCH47_H)
        with Locations((289, -34)):
            Rectangle(SKETCH47_W, SKETCH47_H)
    extrude(amount=BOSS_EXTRUDE24_DEPTH + BOSS_EXTRUDE24_DEPTH_BACK)

    # Sketch48 → Cut-Extrude22 (cut)
    with BuildSketch(Plane(origin=(303, 0, 0), x_dir=(0, 0, -1), z_dir=(1, 0, 0)).offset(CUT_EXTRUDE22_START)):
        with Locations(Location((14, 18, 0), (0, 0, 180))):
            Circle(SKETCH48_R)
        with Locations(Location((-34, 18, 0), (0, 0, 180))):
            Circle(SKETCH48_R)
    extrude(amount=CUT_EXTRUDE22_DEPTH, mode=Mode.SUBTRACT)

    # Fillet1
    fillet1_edges = [part.edges().sort_by_distance(p)[0] for p in [
        (295, 13, 34),
        (295, 13, -14),
        (5, 13, 34),
        (5, 13, -14),
    ]]
    fillet(fillet1_edges, radius=FILLET1_R)

    # Fillet2
    # the kernel refuses this fillet: 2.5 mm, written as the material it adds along each edge
    with BuildSketch(Plane(origin=(-1.25, 8, -9), x_dir=(0, 1, 0), z_dir=(1, 0, 0))) as fillet2_piece_1_section:
        with BuildLine():
            CenterArc((FILLET2_R, FILLET2_R), FILLET2_R, 180, 90)
            Line((0, FILLET2_R), (0, 0))
            Line((0, 0), (FILLET2_R, 0))
        make_face()
    fillet2_piece_1 = extrude(amount=26.25, mode=Mode.PRIVATE)
    fillet2_piece_1 = fillet2_piece_1 - Plane(origin=(0, 8, -8.784630579), x_dir=(1, 0, 0), z_dir=(0, 0, -1)) * Cylinder(5, 63, mode=Mode.PRIVATE)
    add(fillet2_piece_1)
    with BuildSketch(Plane(origin=(25, 8, 29), x_dir=(0, 0, -1), z_dir=(-1, 0, 0))) as fillet2_piece_2_section:
        with BuildLine():
            CenterArc((FILLET2_R, -FILLET2_R), FILLET2_R, 90, 90)
            Line((0, -FILLET2_R), (0, 0))
            Line((0, 0), (FILLET2_R, 0))
        make_face()
    fillet2_piece_2 = extrude(amount=26.25, mode=Mode.PRIVATE)
    fillet2_piece_2 = fillet2_piece_2 - Plane(origin=(0, 8, 28.441580153), x_dir=(1, 0, 0), z_dir=(0, 0, 1)) * Cylinder(5, 63, mode=Mode.PRIVATE)
    add(fillet2_piece_2)
    with BuildSketch(Plane(origin=(301.25, 8, -9), x_dir=(0, 0, 1), z_dir=(-1, 0, 0))) as fillet2_piece_3_section:
        with BuildLine():
            CenterArc((FILLET2_R, FILLET2_R), FILLET2_R, 180, 90)
            Line((0, FILLET2_R), (0, 0))
            Line((0, 0), (FILLET2_R, 0))
        make_face()
    fillet2_piece_3 = extrude(amount=26.25, mode=Mode.PRIVATE)
    fillet2_piece_3 = fillet2_piece_3 - Plane(origin=(300, 8, -8.78460178), x_dir=(-1, 0, 0), z_dir=(0, 0, -1)) * Cylinder(5, 63, mode=Mode.PRIVATE)
    add(fillet2_piece_3)
    with BuildSketch(Plane(origin=(275, 8, 29), x_dir=(0, 0, -1), z_dir=(1, 0, 0))) as fillet2_piece_4_section:
        with BuildLine():
            CenterArc((FILLET2_R, FILLET2_R), FILLET2_R, 180, 90)
            Line((0, FILLET2_R), (0, 0))
            Line((0, 0), (FILLET2_R, 0))
        make_face()
    fillet2_piece_4 = extrude(amount=26.25, mode=Mode.PRIVATE)
    fillet2_piece_4 = fillet2_piece_4 - Plane(origin=(300, 8, 28.441580153), x_dir=(-1, 0, 0), z_dir=(0, 0, 1)) * Cylinder(5, 63, mode=Mode.PRIVATE)
    add(fillet2_piece_4)

    # Fillet3
    fillet3_edges = [part.edges().sort_by_distance(p)[0] for p in [
        (285, -4, 29),
        (285, -4, 39),
        (285, -4, -9),
        (285, -4, -19),
        (15, -4, -9),
        (15, -4, -19),
        (15, -4, 29),
        (15, -4, 39),
    ]]
    fillet(fillet3_edges, radius=FILLET3_R)

    # Fillet4
    fillet4_edges = [part.edges().sort_by_distance(p)[0] for p in [
        (11, 23, -19),
        (11, 23, -9),
        (11, 23, 39),
        (11, 23, 29),
        (289, 23, -9),
        (289, 23, -19),
        (289, 23, 39),
        (289, 23, 29),
    ]]
    fillet(fillet4_edges, radius=FILLET4_R)

    # Sketch49 → Cut-Extrude23 (cut, through all)
    with BuildSketch(Plane(origin=(0, 8, 0), x_dir=(1, 0, 0), z_dir=(0, 1, 0))):
        with Locations(Location((78, -8, 0), (0, 0, 270))):
            Circle(SKETCH49_R)
        with Locations(Location((78, -12, 0), (0, 0, 270))):
            Circle(SKETCH49_R)
    extrude(amount=-CUT_EXTRUDE23_DEPTH, mode=Mode.SUBTRACT)


solid = part.part
